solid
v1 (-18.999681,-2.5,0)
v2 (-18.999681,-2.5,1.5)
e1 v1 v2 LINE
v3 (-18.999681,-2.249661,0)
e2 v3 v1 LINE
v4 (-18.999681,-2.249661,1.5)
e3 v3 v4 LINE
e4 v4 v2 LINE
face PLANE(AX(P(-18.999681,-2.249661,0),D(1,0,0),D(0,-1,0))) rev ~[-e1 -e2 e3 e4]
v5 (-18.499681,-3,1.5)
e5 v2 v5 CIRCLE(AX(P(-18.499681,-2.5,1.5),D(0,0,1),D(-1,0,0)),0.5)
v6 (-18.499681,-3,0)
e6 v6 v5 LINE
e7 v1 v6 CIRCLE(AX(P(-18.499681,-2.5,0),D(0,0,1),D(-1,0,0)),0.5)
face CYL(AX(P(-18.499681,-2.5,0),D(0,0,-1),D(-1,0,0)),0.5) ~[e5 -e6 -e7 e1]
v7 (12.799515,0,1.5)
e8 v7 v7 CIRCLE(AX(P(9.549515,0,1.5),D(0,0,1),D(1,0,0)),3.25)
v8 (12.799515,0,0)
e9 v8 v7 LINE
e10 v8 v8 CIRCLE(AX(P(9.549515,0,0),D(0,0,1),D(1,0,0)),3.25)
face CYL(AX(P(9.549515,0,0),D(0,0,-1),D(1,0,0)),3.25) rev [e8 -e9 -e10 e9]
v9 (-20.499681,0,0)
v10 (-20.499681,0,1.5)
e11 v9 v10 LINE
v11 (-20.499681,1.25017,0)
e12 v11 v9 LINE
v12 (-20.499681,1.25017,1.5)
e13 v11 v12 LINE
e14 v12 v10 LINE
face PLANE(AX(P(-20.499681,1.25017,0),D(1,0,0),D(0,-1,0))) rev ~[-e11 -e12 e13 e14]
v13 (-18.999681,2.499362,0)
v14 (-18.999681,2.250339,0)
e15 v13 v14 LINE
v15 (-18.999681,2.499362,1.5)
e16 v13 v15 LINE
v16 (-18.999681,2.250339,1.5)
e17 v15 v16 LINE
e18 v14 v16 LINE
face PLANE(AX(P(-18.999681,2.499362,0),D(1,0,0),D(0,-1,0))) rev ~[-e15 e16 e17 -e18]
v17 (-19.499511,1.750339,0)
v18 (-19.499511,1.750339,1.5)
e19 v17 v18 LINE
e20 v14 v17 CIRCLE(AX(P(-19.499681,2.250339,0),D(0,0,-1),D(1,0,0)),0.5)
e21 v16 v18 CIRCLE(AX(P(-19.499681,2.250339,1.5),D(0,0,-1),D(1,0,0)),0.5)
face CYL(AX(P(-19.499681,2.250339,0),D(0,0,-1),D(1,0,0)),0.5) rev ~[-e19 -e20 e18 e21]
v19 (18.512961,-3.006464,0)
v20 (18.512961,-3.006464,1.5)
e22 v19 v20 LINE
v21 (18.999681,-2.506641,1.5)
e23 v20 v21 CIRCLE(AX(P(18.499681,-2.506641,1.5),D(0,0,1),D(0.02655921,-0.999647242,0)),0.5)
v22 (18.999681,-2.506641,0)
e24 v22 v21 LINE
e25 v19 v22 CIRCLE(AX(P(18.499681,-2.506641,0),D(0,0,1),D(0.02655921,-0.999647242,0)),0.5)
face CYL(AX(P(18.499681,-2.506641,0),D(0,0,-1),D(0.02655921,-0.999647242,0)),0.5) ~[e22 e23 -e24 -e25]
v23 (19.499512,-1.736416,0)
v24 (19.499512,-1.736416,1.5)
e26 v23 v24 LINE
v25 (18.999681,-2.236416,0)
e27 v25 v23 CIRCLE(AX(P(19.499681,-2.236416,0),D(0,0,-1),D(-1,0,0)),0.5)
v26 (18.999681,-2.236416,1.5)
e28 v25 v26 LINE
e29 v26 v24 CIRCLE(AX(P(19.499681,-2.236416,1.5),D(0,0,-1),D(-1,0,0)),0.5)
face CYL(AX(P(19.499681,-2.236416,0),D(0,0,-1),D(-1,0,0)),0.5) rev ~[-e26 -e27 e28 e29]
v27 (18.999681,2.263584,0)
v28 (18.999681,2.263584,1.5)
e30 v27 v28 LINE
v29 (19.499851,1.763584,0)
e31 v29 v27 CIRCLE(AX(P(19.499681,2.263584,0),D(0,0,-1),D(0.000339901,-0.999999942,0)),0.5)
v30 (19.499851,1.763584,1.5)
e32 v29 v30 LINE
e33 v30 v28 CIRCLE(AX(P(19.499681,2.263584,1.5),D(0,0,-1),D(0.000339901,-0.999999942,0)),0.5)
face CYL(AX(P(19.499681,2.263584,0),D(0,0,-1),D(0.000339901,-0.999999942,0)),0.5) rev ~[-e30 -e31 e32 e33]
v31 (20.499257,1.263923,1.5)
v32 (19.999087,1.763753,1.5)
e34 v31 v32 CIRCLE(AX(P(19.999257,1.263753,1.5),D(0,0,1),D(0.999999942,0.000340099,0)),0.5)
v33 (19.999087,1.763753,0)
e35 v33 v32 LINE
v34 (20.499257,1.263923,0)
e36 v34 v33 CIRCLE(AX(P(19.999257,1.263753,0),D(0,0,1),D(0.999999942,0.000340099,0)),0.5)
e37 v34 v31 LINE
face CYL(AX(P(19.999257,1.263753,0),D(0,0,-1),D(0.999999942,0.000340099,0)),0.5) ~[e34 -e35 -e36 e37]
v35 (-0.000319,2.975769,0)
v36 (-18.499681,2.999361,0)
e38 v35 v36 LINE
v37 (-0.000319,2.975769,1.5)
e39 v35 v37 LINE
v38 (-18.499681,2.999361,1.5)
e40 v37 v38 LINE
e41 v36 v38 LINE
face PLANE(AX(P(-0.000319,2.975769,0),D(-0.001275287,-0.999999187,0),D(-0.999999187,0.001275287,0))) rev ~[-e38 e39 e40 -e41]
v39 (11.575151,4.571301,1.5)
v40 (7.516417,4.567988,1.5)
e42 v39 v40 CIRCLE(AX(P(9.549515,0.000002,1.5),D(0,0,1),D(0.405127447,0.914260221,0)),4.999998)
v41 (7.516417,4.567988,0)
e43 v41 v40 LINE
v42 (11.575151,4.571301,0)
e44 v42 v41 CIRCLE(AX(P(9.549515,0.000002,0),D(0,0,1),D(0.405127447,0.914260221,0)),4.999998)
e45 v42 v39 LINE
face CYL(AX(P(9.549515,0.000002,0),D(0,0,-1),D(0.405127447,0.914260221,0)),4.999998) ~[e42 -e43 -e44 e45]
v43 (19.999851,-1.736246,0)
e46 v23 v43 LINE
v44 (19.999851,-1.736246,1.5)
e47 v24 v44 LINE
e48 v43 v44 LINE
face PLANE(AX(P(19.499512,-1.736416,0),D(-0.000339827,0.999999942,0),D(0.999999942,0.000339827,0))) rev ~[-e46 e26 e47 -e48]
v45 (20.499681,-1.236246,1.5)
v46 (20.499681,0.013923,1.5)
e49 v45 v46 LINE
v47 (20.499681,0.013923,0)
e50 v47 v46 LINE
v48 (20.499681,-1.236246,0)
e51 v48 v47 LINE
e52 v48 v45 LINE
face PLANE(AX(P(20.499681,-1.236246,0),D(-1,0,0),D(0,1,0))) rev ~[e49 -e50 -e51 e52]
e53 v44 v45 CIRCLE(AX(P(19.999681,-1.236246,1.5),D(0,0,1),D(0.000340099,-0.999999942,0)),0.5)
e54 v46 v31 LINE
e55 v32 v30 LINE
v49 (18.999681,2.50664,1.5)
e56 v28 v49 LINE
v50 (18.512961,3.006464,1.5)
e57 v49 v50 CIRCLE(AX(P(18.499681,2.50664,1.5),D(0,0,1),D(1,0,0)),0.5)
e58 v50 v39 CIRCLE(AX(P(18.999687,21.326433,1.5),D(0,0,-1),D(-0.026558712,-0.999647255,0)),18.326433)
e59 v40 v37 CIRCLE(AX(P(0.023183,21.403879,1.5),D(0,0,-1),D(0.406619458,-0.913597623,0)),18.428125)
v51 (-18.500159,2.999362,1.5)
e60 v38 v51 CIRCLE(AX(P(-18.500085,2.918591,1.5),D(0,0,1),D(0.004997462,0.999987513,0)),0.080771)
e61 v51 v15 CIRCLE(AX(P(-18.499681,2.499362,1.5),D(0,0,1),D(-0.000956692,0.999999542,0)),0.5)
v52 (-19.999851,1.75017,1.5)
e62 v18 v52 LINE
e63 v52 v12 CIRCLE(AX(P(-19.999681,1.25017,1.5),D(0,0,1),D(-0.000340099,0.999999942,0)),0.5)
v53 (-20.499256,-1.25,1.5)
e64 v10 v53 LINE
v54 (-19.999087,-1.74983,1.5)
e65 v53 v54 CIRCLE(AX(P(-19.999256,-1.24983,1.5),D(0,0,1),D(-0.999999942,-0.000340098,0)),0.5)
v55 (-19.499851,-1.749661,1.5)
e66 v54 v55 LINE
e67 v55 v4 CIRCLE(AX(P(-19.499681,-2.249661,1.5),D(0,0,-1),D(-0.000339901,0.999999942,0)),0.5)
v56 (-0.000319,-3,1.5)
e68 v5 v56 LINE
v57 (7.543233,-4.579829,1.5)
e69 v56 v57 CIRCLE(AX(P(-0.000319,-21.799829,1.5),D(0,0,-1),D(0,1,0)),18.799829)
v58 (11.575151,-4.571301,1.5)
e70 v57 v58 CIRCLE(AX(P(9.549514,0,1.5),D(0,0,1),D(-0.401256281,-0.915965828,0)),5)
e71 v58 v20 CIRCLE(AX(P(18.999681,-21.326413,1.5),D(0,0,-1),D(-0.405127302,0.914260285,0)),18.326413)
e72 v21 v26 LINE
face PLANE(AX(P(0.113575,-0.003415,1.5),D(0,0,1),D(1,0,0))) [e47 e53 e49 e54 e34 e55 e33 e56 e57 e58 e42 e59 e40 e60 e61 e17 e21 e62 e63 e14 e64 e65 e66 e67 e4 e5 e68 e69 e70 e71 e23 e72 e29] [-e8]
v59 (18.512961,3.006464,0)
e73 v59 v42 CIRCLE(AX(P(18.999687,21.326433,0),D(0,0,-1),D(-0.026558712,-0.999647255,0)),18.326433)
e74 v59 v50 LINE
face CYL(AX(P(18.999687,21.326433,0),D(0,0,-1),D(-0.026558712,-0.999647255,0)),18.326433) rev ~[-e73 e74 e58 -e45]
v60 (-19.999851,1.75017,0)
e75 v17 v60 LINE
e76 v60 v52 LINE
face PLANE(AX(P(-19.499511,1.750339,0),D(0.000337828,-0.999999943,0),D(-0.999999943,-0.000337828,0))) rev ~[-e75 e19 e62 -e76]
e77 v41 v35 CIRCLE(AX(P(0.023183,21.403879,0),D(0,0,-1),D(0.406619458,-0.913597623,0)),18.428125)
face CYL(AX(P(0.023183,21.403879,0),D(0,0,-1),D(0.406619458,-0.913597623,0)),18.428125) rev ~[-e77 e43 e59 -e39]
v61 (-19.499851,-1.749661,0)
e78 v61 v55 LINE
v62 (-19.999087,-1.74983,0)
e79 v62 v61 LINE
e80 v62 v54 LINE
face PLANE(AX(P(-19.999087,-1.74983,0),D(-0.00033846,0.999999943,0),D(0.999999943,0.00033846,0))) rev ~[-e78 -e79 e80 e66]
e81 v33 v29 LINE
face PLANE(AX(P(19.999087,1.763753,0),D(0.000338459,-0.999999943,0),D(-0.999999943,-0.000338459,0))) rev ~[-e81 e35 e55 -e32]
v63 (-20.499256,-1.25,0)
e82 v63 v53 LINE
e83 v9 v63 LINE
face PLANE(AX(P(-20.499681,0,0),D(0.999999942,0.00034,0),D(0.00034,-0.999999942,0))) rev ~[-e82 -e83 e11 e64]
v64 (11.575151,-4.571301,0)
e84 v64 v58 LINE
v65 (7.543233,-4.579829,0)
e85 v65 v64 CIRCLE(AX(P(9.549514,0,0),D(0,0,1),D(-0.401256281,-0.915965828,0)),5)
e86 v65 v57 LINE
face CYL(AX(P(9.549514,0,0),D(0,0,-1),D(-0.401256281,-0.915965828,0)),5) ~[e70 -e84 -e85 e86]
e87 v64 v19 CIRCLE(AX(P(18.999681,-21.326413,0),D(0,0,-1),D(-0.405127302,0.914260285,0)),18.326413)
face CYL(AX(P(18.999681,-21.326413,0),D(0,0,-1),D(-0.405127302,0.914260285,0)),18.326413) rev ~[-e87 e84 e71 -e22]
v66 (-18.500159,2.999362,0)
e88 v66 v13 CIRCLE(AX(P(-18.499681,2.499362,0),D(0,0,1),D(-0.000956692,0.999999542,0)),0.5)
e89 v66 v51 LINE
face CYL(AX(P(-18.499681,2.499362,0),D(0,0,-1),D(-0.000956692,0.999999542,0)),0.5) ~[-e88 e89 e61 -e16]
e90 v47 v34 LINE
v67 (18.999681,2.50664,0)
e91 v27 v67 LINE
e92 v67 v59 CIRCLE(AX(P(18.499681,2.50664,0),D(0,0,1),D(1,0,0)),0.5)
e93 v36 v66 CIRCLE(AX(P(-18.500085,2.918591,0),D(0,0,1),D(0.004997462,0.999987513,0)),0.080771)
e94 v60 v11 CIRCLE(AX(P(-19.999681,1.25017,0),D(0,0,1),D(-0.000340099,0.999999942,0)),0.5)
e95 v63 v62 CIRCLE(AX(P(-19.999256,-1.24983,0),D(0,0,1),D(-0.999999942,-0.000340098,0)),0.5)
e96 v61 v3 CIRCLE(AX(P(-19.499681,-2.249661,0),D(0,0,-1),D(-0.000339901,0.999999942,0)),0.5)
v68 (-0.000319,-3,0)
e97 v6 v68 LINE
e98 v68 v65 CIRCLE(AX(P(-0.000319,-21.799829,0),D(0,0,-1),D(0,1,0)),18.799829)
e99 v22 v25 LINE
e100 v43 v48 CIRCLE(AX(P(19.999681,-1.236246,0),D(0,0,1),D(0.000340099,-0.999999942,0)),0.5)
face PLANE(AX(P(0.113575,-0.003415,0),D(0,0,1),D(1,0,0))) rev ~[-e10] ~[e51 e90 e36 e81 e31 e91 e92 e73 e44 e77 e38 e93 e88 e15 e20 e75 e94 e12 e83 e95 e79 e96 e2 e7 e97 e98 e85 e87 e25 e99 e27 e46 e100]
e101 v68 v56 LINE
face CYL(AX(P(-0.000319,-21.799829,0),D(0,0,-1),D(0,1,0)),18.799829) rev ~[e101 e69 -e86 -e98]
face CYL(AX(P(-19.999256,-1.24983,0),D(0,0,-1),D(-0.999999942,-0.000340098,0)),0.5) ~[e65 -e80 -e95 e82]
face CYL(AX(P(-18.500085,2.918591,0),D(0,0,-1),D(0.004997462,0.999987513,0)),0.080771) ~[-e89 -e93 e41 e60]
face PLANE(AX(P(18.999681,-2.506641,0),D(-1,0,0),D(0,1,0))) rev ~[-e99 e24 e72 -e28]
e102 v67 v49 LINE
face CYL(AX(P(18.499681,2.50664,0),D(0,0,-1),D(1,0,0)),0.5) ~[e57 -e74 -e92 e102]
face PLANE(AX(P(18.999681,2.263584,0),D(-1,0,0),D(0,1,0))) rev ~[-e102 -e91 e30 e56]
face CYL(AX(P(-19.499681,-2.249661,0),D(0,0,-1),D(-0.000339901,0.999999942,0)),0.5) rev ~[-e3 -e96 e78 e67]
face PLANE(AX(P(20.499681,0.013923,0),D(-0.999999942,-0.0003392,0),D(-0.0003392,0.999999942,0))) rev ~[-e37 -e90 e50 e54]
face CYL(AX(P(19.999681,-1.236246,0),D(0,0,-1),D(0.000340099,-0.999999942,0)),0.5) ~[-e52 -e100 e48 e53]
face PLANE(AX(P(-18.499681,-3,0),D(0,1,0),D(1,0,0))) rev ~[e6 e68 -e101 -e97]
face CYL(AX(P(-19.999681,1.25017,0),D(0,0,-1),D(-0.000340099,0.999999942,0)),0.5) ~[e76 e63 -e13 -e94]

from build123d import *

# Parameters (mm, degrees)
F0_R     = 3.25
F1_DEPTH = 1.5


# Not quite as in the source:
# - ends of sketch curves that miss each other by under 0.0002 mm in the source are joined


with BuildPart() as f1:
    # F0 (on Top) → F1 (new body)
    with BuildSketch(Plane.XY):
        with BuildLine():
            ThreePointArc((11.5751507446, -4.5713014237), (14.9674174979, -3.4491015551), (18.5129609838, -3.00646439))
            ThreePointArc((18.5129609838, -3.00646439), (18.8578988072, -2.8554676082), (18.999681, -2.506641))
            Line((18.999681, -2.506641), (18.999681, -2.236416))
            ThreePointArc((18.999681, -2.236416), (19.1460678639, -1.882922365), (19.499512, -1.7364160286))
            Line((19.499512, -1.7364160286), (19.999851, -1.736246))
            ThreePointArc((19.999851, -1.736246), (20.3532944896, -1.5897392814), (20.499681, -1.236246))
            Line((20.499681, -1.236246), (20.499681, 0.013923))
            Line((20.499681, 0.013923), (20.499257, 1.263923))
            ThreePointArc((20.499257, 1.263923), (20.352690162, 1.6174265783), (19.999087, 1.7637529711))
            Line((19.999087, 1.7637529711), (19.499851, 1.763584))
            ThreePointArc((19.499851, 1.763584), (19.1461877186, 1.9099705104), (18.999681, 2.263584))
            Line((18.999681, 2.263584), (18.999681, 2.50664))
            ThreePointArc((18.999681, 2.50664), (18.8578988072, 2.8554666082), (18.5129609897, 3.0064636108))
            ThreePointArc((18.5129609897, 3.0064636108), (14.9674177085, 3.4491015077), (11.575151115, 4.5713012596))
            ThreePointArc((11.575151115, 4.5713012596), (9.5454328003, 4.9999983336), (7.5164170751, 4.5679878314))
            ThreePointArc((7.5164170751, 4.5679878314), (3.8419543275, 3.3757683124), (-0.000319, 2.9757689864))
            Line((-0.000319, 2.9757689864), (-18.499681, 2.999361))
            ThreePointArc((-18.499681, 2.999361), (-18.4999199994, 2.9993618408), (-18.5001589997, 2.9993619744))
            ThreePointArc((-18.5001589997, 2.9993619744), (-18.853403349, 2.8527463514), (-18.999681, 2.499362))
            Line((-18.999681, 2.499362), (-18.999681, 2.250339))
            ThreePointArc((-18.999681, 2.250339), (-19.1460675104, 1.8968457186), (-19.499511, 1.7503390289))
            Line((-19.499511, 1.7503390289), (-19.999851, 1.75017))
            ThreePointArc((-19.999851, 1.75017), (-20.3532944896, 1.6036632814), (-20.499681, 1.25017))
            Line((-20.499681, 1.25017), (-20.499681, 0))
            Line((-20.499681, 0), (-20.499256, -1.25))
            ThreePointArc((-20.499256, -1.25), (-20.3526895157, -1.6035032249), (-19.999087, -1.7498299714))
            Line((-19.999087, -1.7498299714), (-19.499851, -1.749661))
            ThreePointArc((-19.499851, -1.749661), (-19.1461877186, -1.8960475104), (-18.999681, -2.249661))
            Line((-18.999681, -2.249661), (-18.999681, -2.5))
            ThreePointArc((-18.999681, -2.5), (-18.8532343906, -2.8535533906), (-18.499681, -3))
            Line((-18.499681, -3), (-0.000319, -3))
            ThreePointArc((-0.000319, -3), (3.8532843758, -3.3991955476), (7.5432329323, -4.5798291546))
            ThreePointArc((7.5432329323, -4.5798291546), (9.5600895804, -4.9999888178), (11.5751507446, -4.5713014237))
        make_face()
        with Locations((9.549515, 0)):
            Circle(F0_R, mode=Mode.SUBTRACT)
    extrude(amount=F1_DEPTH)


solid = f1.part
